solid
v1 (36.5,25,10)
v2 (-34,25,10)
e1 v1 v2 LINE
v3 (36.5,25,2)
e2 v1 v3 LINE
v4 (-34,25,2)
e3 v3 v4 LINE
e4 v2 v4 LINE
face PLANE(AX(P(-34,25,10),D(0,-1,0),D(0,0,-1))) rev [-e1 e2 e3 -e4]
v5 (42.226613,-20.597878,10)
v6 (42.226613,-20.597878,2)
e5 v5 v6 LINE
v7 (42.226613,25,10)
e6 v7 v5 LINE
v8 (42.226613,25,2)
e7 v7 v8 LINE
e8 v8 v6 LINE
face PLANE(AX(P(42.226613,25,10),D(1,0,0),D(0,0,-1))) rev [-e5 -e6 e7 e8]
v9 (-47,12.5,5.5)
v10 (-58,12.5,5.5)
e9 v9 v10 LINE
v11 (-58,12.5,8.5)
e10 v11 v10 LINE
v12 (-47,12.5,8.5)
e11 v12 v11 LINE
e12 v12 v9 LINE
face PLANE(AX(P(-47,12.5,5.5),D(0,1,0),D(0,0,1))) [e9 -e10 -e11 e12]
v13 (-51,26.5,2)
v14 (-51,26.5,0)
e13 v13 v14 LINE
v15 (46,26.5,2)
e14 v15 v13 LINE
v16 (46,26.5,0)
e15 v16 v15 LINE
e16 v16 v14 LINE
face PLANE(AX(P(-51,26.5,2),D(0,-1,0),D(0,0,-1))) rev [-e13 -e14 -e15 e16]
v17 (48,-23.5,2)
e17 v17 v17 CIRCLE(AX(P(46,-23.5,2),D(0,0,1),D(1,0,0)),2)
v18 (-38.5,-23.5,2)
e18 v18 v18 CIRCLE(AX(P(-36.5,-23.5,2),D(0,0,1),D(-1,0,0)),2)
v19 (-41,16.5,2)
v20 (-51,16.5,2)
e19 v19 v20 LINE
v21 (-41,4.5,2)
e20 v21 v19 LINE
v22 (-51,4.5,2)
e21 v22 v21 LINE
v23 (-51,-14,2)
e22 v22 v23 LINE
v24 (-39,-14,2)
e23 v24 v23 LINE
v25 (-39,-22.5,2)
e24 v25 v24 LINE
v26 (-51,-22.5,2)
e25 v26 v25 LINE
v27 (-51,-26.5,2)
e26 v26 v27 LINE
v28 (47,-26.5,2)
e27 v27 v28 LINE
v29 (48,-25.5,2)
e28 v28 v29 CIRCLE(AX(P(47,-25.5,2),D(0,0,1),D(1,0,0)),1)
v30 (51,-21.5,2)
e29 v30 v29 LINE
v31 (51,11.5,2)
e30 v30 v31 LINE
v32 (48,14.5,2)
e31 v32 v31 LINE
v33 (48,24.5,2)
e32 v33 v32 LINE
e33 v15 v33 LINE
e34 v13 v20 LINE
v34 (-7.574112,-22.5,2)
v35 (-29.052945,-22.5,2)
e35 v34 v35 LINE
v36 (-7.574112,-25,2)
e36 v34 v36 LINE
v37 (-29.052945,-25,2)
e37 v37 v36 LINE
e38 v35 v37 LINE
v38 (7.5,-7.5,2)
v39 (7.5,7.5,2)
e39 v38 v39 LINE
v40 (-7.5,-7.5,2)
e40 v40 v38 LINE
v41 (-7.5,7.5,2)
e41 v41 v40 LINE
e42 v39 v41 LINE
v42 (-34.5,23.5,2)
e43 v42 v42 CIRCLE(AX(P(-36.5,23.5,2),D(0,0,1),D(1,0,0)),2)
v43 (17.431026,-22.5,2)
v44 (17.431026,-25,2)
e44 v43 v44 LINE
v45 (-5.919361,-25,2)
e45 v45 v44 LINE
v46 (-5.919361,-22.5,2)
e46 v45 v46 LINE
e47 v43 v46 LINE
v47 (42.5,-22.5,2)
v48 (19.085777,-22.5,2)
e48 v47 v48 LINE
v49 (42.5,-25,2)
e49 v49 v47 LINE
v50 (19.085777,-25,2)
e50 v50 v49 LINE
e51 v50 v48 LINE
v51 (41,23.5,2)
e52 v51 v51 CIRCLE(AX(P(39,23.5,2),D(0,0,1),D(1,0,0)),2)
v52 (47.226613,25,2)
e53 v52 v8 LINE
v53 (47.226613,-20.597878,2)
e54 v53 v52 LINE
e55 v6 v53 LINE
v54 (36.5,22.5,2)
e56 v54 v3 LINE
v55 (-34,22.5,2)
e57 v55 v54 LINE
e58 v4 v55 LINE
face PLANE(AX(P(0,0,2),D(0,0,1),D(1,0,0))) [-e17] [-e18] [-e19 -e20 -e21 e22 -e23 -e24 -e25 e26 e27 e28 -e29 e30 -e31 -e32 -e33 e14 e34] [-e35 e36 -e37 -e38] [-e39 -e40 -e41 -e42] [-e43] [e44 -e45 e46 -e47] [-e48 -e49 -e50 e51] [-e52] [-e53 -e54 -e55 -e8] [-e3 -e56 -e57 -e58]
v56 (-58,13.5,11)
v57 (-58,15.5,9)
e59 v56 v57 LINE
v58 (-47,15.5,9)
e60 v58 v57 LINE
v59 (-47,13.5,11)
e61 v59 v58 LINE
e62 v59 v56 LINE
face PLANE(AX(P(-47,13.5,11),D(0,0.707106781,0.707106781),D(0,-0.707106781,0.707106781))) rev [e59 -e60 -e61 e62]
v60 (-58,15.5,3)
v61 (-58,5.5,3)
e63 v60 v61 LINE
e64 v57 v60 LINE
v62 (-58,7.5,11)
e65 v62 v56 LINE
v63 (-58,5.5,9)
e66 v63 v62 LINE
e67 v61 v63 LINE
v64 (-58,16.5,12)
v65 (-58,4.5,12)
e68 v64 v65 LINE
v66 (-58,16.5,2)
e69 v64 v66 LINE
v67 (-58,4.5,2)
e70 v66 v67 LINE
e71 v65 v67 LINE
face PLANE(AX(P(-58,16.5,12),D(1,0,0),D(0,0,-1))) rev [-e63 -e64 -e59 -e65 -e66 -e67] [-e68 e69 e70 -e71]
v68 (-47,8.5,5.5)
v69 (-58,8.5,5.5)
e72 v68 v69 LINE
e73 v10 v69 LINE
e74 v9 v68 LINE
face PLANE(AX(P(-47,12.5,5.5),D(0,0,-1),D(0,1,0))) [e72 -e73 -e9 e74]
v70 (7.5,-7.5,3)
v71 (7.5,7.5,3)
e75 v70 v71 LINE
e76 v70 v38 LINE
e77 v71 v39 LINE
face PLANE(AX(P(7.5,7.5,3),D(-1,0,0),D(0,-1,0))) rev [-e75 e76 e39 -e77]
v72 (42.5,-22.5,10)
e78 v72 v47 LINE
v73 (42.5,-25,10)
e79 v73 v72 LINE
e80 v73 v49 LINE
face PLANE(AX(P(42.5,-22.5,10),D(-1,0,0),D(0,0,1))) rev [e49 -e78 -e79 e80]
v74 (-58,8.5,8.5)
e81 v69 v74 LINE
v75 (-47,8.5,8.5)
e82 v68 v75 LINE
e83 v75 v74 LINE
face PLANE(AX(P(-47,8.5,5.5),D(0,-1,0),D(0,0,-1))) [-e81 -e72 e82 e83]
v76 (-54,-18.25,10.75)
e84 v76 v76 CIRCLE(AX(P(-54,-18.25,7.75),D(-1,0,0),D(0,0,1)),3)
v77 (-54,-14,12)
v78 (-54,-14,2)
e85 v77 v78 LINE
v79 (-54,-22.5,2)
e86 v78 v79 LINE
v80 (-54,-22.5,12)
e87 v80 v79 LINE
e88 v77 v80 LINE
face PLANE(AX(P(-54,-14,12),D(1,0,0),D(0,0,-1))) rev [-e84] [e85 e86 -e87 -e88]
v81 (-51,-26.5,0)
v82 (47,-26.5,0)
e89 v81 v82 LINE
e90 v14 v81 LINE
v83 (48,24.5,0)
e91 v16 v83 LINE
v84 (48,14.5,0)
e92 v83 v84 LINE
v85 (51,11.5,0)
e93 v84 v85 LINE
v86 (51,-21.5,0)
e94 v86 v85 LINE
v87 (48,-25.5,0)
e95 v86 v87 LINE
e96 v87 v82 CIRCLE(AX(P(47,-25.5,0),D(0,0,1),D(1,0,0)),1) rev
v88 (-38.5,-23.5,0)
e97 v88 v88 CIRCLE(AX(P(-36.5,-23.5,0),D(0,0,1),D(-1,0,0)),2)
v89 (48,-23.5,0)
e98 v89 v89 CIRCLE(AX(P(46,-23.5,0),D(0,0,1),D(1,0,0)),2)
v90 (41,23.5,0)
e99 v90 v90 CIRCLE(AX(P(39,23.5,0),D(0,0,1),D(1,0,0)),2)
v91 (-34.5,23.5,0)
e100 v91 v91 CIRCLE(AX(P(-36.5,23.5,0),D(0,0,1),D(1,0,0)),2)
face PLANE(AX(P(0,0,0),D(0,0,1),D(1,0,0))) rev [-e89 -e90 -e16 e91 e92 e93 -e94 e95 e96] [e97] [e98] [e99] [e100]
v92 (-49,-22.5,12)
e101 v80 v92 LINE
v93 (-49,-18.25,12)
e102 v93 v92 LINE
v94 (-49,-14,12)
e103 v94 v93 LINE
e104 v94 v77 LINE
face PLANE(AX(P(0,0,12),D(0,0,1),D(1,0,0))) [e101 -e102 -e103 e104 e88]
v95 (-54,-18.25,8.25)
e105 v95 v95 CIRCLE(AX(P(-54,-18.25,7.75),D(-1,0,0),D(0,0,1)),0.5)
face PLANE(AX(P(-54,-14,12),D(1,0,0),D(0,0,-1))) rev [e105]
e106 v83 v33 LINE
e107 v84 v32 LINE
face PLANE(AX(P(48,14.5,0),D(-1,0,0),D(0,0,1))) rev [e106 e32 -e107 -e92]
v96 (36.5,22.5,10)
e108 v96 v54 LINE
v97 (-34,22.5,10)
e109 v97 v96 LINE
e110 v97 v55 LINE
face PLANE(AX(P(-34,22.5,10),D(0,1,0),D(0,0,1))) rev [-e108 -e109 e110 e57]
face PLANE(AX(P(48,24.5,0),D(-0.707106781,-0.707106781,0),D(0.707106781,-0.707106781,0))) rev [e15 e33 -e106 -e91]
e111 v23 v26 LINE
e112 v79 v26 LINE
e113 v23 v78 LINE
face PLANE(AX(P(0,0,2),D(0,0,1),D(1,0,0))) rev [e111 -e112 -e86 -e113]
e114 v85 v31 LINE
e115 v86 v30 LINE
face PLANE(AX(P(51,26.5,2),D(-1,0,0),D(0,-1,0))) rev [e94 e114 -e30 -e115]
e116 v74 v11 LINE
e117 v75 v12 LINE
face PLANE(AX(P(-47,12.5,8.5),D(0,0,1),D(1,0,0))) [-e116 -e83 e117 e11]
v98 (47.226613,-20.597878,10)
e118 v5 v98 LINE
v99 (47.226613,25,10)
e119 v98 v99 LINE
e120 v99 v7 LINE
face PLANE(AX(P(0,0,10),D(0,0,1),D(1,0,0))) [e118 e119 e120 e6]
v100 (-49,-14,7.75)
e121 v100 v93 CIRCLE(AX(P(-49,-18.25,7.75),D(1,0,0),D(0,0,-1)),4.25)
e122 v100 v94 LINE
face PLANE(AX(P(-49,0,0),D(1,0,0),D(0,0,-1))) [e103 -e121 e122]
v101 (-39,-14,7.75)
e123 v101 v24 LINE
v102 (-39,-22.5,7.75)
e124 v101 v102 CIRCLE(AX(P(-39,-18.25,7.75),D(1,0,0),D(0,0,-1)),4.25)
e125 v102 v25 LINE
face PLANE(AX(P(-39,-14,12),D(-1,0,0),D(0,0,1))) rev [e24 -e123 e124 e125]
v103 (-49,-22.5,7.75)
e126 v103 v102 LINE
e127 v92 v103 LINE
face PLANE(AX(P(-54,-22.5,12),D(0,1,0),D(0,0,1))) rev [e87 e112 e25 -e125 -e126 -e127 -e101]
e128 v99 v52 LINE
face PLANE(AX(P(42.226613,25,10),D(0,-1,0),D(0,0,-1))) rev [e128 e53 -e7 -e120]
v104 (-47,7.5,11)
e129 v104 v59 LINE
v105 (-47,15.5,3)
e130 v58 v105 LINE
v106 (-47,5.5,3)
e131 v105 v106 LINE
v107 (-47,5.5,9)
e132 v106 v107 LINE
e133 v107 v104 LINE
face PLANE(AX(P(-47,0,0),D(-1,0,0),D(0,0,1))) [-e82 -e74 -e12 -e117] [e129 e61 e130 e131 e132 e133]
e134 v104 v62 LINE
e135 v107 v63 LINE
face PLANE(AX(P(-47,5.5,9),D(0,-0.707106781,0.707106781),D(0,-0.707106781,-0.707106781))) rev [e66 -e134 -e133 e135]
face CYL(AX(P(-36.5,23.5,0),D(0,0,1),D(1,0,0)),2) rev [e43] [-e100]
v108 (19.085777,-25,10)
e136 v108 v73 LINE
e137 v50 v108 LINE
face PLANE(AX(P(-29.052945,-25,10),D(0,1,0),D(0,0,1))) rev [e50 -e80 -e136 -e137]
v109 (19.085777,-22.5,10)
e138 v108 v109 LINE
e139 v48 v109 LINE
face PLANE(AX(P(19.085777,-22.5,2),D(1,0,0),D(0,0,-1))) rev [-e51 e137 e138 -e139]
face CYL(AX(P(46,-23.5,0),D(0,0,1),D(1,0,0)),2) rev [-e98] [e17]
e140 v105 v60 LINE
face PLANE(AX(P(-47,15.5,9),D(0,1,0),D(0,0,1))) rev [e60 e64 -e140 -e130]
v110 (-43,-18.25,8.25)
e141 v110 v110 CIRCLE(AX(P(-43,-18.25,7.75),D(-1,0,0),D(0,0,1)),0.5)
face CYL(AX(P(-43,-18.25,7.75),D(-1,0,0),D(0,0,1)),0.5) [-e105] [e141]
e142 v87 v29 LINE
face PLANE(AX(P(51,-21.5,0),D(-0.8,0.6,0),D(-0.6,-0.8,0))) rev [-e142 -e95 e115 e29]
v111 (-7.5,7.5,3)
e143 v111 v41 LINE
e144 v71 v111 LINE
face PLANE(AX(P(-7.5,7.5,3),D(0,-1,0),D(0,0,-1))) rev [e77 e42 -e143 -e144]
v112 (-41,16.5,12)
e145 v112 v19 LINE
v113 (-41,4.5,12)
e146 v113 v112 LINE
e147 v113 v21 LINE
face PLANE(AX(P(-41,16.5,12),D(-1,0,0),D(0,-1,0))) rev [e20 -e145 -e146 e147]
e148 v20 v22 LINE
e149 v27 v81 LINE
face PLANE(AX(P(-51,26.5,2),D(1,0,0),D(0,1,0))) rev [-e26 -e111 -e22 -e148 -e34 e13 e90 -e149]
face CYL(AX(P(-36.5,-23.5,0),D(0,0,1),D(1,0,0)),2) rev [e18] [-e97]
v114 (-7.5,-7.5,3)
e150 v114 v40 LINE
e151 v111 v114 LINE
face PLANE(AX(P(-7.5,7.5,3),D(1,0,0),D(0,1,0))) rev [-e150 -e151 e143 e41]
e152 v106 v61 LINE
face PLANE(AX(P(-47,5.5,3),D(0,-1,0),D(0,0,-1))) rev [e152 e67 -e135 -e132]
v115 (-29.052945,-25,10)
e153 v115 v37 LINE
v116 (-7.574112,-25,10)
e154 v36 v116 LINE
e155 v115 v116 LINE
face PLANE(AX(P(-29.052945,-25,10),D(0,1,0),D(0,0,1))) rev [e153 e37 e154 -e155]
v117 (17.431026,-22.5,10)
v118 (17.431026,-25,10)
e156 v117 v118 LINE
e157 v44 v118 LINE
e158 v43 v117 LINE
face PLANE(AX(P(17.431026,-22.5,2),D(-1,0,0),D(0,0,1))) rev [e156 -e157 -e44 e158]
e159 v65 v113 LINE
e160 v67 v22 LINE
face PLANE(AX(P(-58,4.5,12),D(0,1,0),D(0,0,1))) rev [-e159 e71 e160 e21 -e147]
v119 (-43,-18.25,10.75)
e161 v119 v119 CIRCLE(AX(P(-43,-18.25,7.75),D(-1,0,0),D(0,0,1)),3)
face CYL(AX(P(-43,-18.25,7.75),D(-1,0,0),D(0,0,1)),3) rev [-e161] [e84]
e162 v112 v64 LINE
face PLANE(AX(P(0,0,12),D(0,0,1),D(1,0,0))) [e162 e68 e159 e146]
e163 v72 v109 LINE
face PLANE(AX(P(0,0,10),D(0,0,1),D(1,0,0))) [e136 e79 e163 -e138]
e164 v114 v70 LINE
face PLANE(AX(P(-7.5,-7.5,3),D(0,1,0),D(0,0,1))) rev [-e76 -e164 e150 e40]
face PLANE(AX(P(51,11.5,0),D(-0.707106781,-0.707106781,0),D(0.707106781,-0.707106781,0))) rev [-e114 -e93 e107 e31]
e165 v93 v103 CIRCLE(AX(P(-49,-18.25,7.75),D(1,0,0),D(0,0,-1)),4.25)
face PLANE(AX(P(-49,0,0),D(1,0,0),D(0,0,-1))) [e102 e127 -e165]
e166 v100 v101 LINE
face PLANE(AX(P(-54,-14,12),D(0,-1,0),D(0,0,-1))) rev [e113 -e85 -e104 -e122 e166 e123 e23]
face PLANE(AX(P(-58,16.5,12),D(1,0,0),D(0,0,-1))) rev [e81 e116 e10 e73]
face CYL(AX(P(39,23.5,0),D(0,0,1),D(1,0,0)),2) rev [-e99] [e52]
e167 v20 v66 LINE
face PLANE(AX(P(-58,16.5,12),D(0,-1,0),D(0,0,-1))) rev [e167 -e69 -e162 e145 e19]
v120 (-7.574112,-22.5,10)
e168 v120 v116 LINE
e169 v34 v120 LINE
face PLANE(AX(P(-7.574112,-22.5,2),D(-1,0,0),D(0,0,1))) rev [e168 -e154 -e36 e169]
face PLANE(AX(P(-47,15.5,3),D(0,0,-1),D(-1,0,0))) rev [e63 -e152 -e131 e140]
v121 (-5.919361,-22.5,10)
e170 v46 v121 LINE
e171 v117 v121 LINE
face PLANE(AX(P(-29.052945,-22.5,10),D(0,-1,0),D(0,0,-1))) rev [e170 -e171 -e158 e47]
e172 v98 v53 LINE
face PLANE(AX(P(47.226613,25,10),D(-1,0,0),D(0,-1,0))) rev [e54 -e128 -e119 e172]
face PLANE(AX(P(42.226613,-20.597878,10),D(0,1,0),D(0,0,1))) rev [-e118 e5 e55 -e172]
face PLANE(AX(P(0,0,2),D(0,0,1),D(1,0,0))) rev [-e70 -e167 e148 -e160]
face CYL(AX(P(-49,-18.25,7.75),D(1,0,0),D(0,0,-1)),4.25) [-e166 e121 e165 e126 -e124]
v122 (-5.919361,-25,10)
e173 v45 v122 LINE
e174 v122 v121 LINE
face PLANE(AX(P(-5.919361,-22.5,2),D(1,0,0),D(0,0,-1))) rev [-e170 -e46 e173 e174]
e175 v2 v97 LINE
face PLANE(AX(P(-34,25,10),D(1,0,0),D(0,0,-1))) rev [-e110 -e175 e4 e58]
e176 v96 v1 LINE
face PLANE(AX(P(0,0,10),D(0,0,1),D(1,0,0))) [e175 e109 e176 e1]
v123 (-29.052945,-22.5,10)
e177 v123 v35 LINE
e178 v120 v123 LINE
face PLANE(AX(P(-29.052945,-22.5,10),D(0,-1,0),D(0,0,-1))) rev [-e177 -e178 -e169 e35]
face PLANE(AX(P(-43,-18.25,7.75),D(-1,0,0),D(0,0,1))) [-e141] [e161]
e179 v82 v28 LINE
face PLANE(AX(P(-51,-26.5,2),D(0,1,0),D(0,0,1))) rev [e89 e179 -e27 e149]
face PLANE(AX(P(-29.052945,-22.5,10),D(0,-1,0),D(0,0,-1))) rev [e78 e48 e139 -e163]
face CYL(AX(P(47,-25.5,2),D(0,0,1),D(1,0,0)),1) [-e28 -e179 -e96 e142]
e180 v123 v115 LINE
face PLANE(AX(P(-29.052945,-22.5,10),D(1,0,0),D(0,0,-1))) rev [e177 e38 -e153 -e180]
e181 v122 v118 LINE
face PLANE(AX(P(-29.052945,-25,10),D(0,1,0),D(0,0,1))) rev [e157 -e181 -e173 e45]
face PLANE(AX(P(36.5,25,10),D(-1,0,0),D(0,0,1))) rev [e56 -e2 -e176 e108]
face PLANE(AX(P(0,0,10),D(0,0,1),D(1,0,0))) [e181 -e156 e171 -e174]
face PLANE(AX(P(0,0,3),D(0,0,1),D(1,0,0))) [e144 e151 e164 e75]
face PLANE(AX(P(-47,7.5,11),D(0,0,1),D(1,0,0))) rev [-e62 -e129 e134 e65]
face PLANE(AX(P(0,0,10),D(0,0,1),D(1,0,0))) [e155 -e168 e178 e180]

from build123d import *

# Parameters (mm, degrees)
SKETCH_2_W          = 102
SKETCH_2_H          = 53
EXTRUDE_1_DEPTH     = 2
CUT_EXTRUDE_1_DEPTH = 2
SKETCH_4_R          = 2
CUT_EXTRUDE_2_DEPTH = 2
FILLET_1_R          = 1
SKETCH_5_R          = 2
CUT_EXTRUDE_3_DEPTH = 2
SKETCH_6_W          = 17
SKETCH_6_H          = 12
EXTRUDE_2_DEPTH     = 10
SKETCH_7_W          = 70.5
SKETCH_7_H          = 2.5
SKETCH_7_W_2        = 5
SKETCH_7_H_2        = 45.597878471
SKETCH_7_W_3        = 71.552945179
EXTRUDE_3_DEPTH     = 8
SKETCH_8_W          = 15
SKETCH_8_H          = 15
EXTRUDE_4_DEPTH     = 1
SKETCH_9_W          = 1.65475178
SKETCH_9_H          = 2.5
CUT_EXTRUDE_4_DEPTH = 8
SKETCH_10_W         = 15
SKETCH_10_H         = 8.5
EXTRUDE_5_DEPTH     = 10
CUT_EXTRUDE_5_DEPTH = 10
SKETCH_12_R         = 3
SKETCH_12_R_2       = 0.5
CUT_EXTRUDE_6_DEPTH = 11
SKETCH_13_W         = 3
SKETCH_13_H         = 4
CUT_EXTRUDE_7_DEPTH = 11


with BuildPart() as part:
    # 草图2 → 凸台-拉伸1 (new body)
    with BuildSketch(Plane.XY):
        Rectangle(SKETCH_2_W, SKETCH_2_H)
    extrude(amount=EXTRUDE_1_DEPTH)

    # 草图3 → 切除-拉伸1 (cut)
    with BuildSketch(Plane.XY.offset(2)):
        Polygon((51, 11.5), (48, 14.5), (48, 24.5), (46, 26.5), (51, 26.5), align=None)
        Polygon((51, -21.5), (48, -25.5), (48, -26.5), (51, -26.5), align=None)
    extrude(amount=-CUT_EXTRUDE_1_DEPTH, mode=Mode.SUBTRACT)

    # 草图4 → 切除-拉伸2 (cut)
    with BuildSketch(Plane.XY.offset(2)):
        with Locations((46, -23.5)):
            Circle(SKETCH_4_R)
    extrude(amount=-CUT_EXTRUDE_2_DEPTH, mode=Mode.SUBTRACT)

    # 圆角1
    fillet_1_edges = [part.edges().sort_by_distance(p)[0] for p in [
        (48, -26.5, 1),
    ]]
    fillet(fillet_1_edges, radius=FILLET_1_R - 0.0001)  # a hair under: the kernel refuses the full size

    # 草图5 → 切除-拉伸3 (cut)
    with BuildSketch(Plane.XY.offset(2)):
        with Locations((39, 23.5)):
            Circle(SKETCH_5_R)
        with Locations((-36.5, 23.5)):
            Circle(SKETCH_5_R)
        with Locations(Location((-36.5, -23.5, 0), (0, 0, 180))):
            Circle(SKETCH_5_R)
    extrude(amount=-CUT_EXTRUDE_3_DEPTH, mode=Mode.SUBTRACT)

    # 草图6 → 凸台-拉伸2 (add)
    with BuildSketch(Plane.XY.offset(2)):
        with Locations((-49.5, 10.5)):
            Rectangle(SKETCH_6_W, SKETCH_6_H)
    extrude(amount=EXTRUDE_2_DEPTH)

    # 草图7 → 凸台-拉伸3 (add)
    with BuildSketch(Plane.XY.offset(2)):
        with Locations((1.25, 23.75)):
            Rectangle(SKETCH_7_W, SKETCH_7_H)
        with Locations((44.72661283, 2.201060764)):
            Rectangle(SKETCH_7_W_2, SKETCH_7_H_2)
        with Locations((6.72352741, -23.75)):
            Rectangle(SKETCH_7_W_3, SKETCH_7_H)
    extrude(amount=EXTRUDE_3_DEPTH)

    # 草图8 → 凸台-拉伸4 (add)
    with BuildSketch(Plane.XY.offset(2)):
        Rectangle(SKETCH_8_W, SKETCH_8_H)
    extrude(amount=EXTRUDE_4_DEPTH)

    # 草图9 → 切除-拉伸4 (cut)
    with BuildSketch(Plane.XY.offset(10)):
        with Locations((-6.746736472, -23.75)):
            Rectangle(SKETCH_9_W, SKETCH_9_H)
        with Locations((18.258401548, -23.75)):
            Rectangle(SKETCH_9_W, SKETCH_9_H)
    extrude(amount=-CUT_EXTRUDE_4_DEPTH, mode=Mode.SUBTRACT)

    # 草图10 → 凸台-拉伸5 (add)
    with BuildSketch(Plane.XY.offset(2)):
        with Locations((-46.5, -18.25)):
            Rectangle(SKETCH_10_W, SKETCH_10_H)
    extrude(amount=EXTRUDE_5_DEPTH)

    # 草图11 → 切除-拉伸5 (cut)
    with BuildSketch(Plane(origin=(-39, 0, 0), x_dir=(0, 0, -1), z_dir=(1, 0, 0))):
        with BuildLine():
            ThreePointArc((-7.75, -22.5), (-10.75520382, -21.25520382), (-12, -18.25))
            Line((-12, -18.25), (-12, -22.5))
            Line((-12, -22.5), (-7.75, -22.5))
        make_face()
        with BuildLine():
            Line((-7.75, -14), (-12, -14))
            Line((-12, -14), (-12, -18.25))
            ThreePointArc((-12, -18.25), (-10.75520382, -15.24479618), (-7.75, -14))
        make_face()
    extrude(amount=-CUT_EXTRUDE_5_DEPTH, mode=Mode.SUBTRACT)

    # 草图12 → 切除-拉伸6 (cut)
    with BuildSketch(Plane.ZY.offset(54)):
        with Locations((7.75, -18.25)):
            Circle(SKETCH_12_R)
        with Locations((7.75, -18.25)):
            Circle(SKETCH_12_R_2, mode=Mode.SUBTRACT)
    extrude(amount=-CUT_EXTRUDE_6_DEPTH, mode=Mode.SUBTRACT)

    # 草图13 → 切除-拉伸7 (cut)
    with BuildSketch(Plane.ZY.offset(58)):
        Polygon((11, 13.5), (9, 15.5), (3, 15.5), (3, 5.5), (9, 5.5), (11, 7.5), align=None)
        with Locations((7, 10.5)):
            Rectangle(SKETCH_13_W, SKETCH_13_H, mode=Mode.SUBTRACT)
    extrude(amount=-CUT_EXTRUDE_7_DEPTH, mode=Mode.SUBTRACT)


solid = part.part
